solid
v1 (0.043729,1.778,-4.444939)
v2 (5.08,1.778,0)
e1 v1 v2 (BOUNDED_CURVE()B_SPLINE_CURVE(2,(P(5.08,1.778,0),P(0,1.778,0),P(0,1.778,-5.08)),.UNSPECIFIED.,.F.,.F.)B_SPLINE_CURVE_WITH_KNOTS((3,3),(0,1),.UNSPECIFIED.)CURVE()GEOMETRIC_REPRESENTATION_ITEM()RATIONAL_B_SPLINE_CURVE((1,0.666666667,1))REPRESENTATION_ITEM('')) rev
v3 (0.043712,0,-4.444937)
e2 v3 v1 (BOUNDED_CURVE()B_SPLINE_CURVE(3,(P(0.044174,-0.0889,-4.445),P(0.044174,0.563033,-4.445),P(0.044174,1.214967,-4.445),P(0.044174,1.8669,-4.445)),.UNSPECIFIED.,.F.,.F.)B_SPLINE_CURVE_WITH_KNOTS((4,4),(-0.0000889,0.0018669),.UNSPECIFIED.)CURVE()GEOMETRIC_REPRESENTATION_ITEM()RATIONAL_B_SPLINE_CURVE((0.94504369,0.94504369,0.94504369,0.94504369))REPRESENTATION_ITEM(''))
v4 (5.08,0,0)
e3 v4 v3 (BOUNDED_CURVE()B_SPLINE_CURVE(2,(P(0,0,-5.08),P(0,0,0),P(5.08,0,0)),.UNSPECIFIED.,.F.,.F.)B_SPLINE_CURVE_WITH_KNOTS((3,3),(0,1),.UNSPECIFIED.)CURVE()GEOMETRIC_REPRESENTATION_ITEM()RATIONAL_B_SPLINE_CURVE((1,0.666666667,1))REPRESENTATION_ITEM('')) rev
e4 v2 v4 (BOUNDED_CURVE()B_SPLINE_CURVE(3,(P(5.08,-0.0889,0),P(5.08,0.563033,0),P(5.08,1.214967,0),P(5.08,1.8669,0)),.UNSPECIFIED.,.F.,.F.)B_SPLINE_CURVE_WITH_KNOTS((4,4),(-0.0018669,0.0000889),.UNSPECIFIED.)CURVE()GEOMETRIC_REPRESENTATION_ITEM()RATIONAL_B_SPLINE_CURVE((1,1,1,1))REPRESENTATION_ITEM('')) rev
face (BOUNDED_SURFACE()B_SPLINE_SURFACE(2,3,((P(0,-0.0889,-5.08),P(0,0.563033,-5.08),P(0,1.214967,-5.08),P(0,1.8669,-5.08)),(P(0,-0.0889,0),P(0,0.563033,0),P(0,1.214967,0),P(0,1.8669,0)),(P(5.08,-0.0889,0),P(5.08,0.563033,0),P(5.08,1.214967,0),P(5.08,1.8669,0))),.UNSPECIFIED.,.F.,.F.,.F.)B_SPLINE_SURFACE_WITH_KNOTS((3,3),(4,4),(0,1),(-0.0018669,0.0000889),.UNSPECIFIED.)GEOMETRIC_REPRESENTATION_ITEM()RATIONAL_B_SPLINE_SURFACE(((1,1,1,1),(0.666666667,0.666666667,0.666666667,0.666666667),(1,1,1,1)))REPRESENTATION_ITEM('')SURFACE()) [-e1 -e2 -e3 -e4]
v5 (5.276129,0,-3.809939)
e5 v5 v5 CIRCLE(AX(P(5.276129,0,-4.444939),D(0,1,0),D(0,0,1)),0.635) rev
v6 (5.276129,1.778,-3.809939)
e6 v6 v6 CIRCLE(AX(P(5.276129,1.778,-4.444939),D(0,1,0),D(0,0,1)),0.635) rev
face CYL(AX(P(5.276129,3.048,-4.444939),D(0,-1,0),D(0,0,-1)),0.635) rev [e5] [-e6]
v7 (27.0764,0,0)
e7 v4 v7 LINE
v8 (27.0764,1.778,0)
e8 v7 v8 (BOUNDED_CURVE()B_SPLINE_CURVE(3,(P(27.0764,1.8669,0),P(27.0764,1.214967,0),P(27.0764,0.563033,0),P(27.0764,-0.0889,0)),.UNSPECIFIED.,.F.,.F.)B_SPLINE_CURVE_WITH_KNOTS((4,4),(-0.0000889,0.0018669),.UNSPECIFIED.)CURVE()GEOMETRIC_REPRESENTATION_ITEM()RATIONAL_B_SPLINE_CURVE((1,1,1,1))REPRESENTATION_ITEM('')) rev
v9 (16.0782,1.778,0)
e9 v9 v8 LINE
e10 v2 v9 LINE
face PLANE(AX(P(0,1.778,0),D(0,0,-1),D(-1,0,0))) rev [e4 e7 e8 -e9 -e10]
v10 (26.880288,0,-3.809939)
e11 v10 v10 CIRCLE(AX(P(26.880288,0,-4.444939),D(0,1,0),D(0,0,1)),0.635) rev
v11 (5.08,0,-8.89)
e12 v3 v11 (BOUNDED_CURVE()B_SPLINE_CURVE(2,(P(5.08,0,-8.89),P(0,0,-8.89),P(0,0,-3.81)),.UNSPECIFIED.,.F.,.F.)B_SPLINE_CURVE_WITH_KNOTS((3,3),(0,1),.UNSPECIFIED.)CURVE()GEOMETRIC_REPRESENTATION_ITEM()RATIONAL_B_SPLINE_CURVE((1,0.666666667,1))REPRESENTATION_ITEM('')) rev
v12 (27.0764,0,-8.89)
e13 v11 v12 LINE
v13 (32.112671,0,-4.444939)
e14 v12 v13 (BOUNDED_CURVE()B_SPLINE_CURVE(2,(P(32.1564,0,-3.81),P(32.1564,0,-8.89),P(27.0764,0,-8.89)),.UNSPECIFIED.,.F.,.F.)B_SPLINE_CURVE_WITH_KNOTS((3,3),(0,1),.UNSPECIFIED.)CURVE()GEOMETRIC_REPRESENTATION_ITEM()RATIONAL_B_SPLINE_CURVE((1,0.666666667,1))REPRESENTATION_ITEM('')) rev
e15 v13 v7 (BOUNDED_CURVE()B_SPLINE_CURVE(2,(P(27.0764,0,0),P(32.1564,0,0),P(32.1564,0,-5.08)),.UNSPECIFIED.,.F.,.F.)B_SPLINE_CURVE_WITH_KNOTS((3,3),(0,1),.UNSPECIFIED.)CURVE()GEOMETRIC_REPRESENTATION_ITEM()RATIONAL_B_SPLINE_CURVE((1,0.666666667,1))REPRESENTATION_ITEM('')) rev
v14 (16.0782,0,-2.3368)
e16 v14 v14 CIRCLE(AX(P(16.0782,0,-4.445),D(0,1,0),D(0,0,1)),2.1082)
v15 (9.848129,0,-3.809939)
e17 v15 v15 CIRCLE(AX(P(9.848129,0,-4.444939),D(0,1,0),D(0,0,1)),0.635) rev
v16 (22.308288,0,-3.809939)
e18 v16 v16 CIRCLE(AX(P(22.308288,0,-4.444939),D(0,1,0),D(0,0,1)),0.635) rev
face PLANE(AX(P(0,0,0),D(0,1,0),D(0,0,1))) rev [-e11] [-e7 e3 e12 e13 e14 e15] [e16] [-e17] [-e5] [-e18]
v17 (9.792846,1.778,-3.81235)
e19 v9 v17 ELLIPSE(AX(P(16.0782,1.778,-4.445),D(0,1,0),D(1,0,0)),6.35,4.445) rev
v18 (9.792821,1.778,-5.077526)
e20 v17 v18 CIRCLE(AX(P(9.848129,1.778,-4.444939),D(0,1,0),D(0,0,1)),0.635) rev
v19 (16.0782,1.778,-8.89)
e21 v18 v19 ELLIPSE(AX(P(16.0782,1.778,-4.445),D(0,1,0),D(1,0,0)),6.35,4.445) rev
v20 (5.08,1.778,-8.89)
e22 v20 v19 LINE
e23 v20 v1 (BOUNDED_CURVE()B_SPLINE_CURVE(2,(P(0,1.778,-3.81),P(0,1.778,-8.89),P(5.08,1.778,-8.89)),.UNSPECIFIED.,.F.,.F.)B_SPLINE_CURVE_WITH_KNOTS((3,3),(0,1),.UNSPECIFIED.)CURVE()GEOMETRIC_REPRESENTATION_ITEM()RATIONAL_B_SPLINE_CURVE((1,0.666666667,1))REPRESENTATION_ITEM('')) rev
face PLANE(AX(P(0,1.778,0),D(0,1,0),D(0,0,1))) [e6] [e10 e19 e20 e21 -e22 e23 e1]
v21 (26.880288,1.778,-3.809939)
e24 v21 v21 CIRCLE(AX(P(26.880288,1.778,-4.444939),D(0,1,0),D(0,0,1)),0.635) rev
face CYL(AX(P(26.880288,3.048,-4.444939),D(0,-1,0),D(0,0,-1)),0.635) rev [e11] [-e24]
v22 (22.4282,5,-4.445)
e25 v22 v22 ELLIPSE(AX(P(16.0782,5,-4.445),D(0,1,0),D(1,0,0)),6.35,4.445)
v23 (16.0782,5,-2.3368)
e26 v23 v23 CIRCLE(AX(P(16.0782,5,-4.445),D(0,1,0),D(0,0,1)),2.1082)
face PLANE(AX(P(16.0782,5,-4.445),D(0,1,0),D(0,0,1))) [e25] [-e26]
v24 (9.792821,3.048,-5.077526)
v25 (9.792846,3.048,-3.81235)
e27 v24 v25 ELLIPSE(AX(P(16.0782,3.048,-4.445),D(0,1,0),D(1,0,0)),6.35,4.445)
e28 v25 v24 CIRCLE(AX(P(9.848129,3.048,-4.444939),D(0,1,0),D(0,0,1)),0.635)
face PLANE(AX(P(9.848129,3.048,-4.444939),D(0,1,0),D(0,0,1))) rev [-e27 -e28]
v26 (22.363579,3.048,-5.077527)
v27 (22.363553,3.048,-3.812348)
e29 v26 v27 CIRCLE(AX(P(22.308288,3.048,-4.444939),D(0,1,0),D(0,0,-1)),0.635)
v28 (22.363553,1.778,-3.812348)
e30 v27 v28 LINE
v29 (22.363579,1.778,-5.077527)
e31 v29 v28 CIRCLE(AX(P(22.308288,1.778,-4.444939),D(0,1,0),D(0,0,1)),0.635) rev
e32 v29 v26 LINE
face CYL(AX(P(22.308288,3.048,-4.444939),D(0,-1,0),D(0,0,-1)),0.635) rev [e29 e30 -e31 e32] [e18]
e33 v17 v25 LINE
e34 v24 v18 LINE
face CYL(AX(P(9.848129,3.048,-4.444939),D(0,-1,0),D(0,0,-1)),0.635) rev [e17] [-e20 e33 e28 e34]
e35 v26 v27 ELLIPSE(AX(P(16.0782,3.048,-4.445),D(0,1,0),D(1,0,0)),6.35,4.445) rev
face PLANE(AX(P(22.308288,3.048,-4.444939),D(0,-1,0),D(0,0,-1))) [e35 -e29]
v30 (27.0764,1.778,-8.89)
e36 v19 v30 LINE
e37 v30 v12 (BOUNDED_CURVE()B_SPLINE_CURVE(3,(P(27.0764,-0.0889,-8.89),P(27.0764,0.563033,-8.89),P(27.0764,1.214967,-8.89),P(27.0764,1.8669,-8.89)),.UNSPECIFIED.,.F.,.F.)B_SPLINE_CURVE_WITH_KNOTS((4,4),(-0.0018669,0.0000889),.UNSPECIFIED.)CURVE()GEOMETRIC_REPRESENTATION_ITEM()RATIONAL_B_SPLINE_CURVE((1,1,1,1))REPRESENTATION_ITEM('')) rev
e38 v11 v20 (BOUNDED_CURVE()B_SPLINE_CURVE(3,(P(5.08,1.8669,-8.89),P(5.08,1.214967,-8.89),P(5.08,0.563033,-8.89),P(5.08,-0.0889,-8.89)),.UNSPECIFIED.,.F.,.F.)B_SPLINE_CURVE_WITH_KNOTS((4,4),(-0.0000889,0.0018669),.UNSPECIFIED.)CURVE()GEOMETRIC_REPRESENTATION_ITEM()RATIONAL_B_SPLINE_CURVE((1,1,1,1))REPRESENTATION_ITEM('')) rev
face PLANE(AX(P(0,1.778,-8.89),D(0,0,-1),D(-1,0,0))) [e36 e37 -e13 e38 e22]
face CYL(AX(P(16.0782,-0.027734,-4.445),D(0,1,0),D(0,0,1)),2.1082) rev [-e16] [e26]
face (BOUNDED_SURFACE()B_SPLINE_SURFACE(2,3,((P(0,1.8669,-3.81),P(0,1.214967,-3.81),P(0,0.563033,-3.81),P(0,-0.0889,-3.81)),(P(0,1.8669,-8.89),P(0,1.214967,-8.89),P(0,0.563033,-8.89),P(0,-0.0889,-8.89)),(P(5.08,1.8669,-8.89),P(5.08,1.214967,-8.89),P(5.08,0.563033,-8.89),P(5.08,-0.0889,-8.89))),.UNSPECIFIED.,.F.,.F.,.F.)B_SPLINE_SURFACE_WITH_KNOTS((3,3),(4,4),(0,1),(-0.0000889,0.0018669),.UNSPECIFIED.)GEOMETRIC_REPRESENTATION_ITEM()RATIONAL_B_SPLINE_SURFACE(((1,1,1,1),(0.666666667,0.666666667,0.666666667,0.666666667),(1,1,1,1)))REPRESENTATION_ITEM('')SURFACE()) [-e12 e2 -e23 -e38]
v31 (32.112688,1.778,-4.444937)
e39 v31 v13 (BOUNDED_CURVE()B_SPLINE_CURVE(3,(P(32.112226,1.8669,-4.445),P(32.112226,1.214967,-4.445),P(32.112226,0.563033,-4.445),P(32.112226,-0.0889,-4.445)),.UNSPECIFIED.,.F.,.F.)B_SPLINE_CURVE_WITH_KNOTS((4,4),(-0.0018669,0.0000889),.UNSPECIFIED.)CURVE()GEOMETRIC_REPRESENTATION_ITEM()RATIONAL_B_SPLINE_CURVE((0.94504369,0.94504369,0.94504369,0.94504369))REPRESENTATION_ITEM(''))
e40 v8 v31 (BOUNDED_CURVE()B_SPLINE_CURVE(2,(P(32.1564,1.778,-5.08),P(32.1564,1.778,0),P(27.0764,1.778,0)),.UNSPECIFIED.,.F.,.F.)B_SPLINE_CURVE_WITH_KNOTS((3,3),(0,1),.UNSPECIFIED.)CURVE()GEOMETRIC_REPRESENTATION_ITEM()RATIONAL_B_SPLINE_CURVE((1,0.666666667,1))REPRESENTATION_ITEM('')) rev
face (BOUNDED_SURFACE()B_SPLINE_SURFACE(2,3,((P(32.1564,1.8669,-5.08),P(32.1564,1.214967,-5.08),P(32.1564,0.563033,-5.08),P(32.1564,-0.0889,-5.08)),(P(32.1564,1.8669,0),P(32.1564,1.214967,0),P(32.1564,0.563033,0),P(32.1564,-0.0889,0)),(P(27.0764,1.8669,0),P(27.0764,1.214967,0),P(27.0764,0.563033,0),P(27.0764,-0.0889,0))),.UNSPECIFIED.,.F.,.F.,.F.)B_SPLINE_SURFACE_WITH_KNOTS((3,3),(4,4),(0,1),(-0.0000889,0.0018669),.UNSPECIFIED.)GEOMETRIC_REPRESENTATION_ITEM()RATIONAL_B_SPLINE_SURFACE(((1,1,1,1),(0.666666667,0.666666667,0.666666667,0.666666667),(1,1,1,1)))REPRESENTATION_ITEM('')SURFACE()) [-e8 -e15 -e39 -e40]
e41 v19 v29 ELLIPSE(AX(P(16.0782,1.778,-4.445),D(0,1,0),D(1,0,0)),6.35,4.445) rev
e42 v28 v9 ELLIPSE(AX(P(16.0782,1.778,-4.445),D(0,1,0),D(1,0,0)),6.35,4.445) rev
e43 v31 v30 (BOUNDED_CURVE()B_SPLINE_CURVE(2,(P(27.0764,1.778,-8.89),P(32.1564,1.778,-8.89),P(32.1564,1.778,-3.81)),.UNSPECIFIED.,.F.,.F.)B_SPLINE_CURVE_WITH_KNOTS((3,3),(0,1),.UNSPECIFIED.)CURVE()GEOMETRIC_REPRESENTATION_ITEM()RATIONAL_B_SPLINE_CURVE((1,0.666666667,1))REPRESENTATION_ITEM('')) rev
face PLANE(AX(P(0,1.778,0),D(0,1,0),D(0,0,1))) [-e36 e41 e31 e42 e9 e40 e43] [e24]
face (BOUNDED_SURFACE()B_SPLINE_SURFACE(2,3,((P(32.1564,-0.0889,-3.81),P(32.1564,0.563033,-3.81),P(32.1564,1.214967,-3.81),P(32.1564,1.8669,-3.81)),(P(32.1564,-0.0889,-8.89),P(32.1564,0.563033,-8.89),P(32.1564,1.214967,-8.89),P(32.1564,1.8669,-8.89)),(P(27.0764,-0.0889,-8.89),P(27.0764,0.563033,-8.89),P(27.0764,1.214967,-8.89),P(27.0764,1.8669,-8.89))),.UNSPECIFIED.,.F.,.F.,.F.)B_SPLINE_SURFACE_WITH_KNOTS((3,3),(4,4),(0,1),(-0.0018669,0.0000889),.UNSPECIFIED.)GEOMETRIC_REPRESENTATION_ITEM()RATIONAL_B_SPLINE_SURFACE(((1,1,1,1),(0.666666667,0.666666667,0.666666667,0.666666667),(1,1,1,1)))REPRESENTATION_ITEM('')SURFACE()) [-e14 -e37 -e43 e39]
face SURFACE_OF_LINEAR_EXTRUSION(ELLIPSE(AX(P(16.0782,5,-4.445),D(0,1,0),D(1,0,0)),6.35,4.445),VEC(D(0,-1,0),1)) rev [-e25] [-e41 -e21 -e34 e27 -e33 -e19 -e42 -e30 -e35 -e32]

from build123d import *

# Parameters (mm, degrees)
SKETCH1_W               = 32.1564
SKETCH1_H               = 8.89
SKETCH1_R               = 1.2319
BOSS_EXTRUDE1_DEPTH     = 1.778
CUT_EXTRUDE1_DEPTH      = 32.409990197
CUT_EXTRUDE1_DEPTH_BACK = 34.409990197
CUT_EXTRUDE1_START      = 2
FILLET1_SIZE            = 5.08
SKETCH1_7_RX            = 6.35
SKETCH1_7_RY            = 4.445
BOSS_EXTRUDE2_DEPTH     = 5
CUT_EXTRUDE2_DEPTH      = 34.69313211
CUT_EXTRUDE2_DEPTH_BACK = 34.69313211
CUT_EXTRUDE3_DEPTH      = 1.27
CUT_EXTRUDE3_DEPTH_BACK = 12.7
SKETCH2_R               = 0.635


with BuildPart() as part:
    # Sketch1 → Boss-Extrude1 (new body)
    with BuildSketch(Plane(origin=(0, 0, 0), x_dir=(1, 0, 0), z_dir=(0, 1, 0))):
        with Locations((16.0782, 4.445)):
            Rectangle(SKETCH1_W, SKETCH1_H)
        with Locations(Location((16.0782, 4.445, 0), (0, 0, 270))):
            Circle(SKETCH1_R, mode=Mode.SUBTRACT)
    extrude(amount=BOSS_EXTRUDE1_DEPTH)

    # Sketch1<5> → Cut-Extrude1 (cut, two sides: drawn at the far end of the back side and taken through both)
    with BuildSketch(Plane(origin=(0, 0, 0), x_dir=(1, 0, 0), z_dir=(0, 1, 0)).offset(CUT_EXTRUDE1_START - CUT_EXTRUDE1_DEPTH_BACK)):
        with BuildLine():
            ThreePointArc((18.1864, 4.445), (17.568922516, 5.935722516), (16.0782, 6.5532))
            Line((16.0782, 6.5532), (16.0782, 5.6769))
            ThreePointArc((16.0782, 5.6769), (16.949284844, 5.316084844), (17.3101, 4.445))
            ThreePointArc((17.3101, 4.445), (16.949284844, 3.573915156), (16.0782, 3.2131))
            Line((16.0782, 3.2131), (16.0782, 2.3368))
            ThreePointArc((16.0782, 2.3368), (17.568922516, 2.954277484), (18.1864, 4.445))
        make_face()
        with BuildLine():
            Line((16.0782, 5.6769), (16.0782, 6.5532))
            ThreePointArc((16.0782, 6.5532), (13.97, 4.445), (16.0782, 2.3368))
            Line((16.0782, 2.3368), (16.0782, 3.2131))
            ThreePointArc((16.0782, 3.2131), (14.8463, 4.445), (16.0782, 5.6769))
        make_face()
        with BuildLine():
            ThreePointArc((17.3101, 4.445), (16.949284844, 5.316084844), (16.0782, 5.6769))
            Line((16.0782, 5.6769), (16.0782, 3.2131))
            ThreePointArc((16.0782, 3.2131), (16.949284844, 3.573915156), (17.3101, 4.445))
        make_face()
        with BuildLine():
            Line((16.0782, 3.2131), (16.0782, 5.6769))
            ThreePointArc((16.0782, 5.6769), (14.8463, 4.445), (16.0782, 3.2131))
        make_face()
    extrude(amount=CUT_EXTRUDE1_DEPTH + CUT_EXTRUDE1_DEPTH_BACK, mode=Mode.SUBTRACT)

    # Fillet1
    # a fillet whose section is not a circle: 5.08 mm, written as the material it takes off along each edge
    with BuildSketch(Plane(origin=(32.1564, -12.7, -8.89), x_dir=(0, 0, 1), z_dir=(0, 1, 0)), Plane(origin=(32.1564, -12.7, 0), x_dir=(-1, 0, 0), z_dir=(0, 1, 0))) as fillet1_piece_1:
        with BuildLine():
            Bezier((FILLET1_SIZE, 0), (0, 0), (0, -FILLET1_SIZE), weights=[1, 0.666666667, 1])
            Line((0, -FILLET1_SIZE), (0, 0))
            Line((0, 0), (FILLET1_SIZE, 0))
        make_face()
    extrude(amount=27.178, mode=Mode.SUBTRACT)
    with BuildSketch(Plane(origin=(0, -12.7, -8.89), x_dir=(0, 0, 1), z_dir=(0, 1, 0)), Plane(origin=(0, -12.7, 0), x_dir=(1, 0, 0), z_dir=(0, 1, 0))) as fillet1_piece_2:
        with BuildLine():
            Bezier((FILLET1_SIZE, 0), (0, 0), (0, FILLET1_SIZE), weights=[1, 0.666666667, 1])
            Line((0, FILLET1_SIZE), (0, 0))
            Line((0, 0), (FILLET1_SIZE, 0))
        make_face()
    extrude(amount=27.178, mode=Mode.SUBTRACT)

    # Sketch1<7> → Boss-Extrude2 (add)
    with BuildSketch(Plane(origin=(0, 0, 0), x_dir=(1, 0, 0), z_dir=(0, 1, 0))):
        with Locations(Location((16.0782, 4.445), (0, 0, 0))):
            Ellipse(SKETCH1_7_RX, SKETCH1_7_RY)
    extrude(amount=BOSS_EXTRUDE2_DEPTH)

    # Sketch1<8> → Cut-Extrude2 (cut, two sides: drawn at the far end of the back side and taken through both)
    with BuildSketch(Plane(origin=(0, 0, 0), x_dir=(1, 0, 0), z_dir=(0, 1, 0)).offset(-CUT_EXTRUDE2_DEPTH_BACK)):
        with BuildLine():
            ThreePointArc((18.1864, 4.445), (17.568922516, 5.935722516), (16.0782, 6.5532))
            Line((16.0782, 6.5532), (16.0782, 5.6769))
            ThreePointArc((16.0782, 5.6769), (16.949284844, 5.316084844), (17.3101, 4.445))
            ThreePointArc((17.3101, 4.445), (16.949284844, 3.573915156), (16.0782, 3.2131))
            Line((16.0782, 3.2131), (16.0782, 2.3368))
            ThreePointArc((16.0782, 2.3368), (17.568922516, 2.954277484), (18.1864, 4.445))
        make_face()
        with BuildLine():
            Line((16.0782, 5.6769), (16.0782, 6.5532))
            ThreePointArc((16.0782, 6.5532), (13.97, 4.445), (16.0782, 2.3368))
            Line((16.0782, 2.3368), (16.0782, 3.2131))
            ThreePointArc((16.0782, 3.2131), (14.8463, 4.445), (16.0782, 5.6769))
        make_face()
    extrude(amount=CUT_EXTRUDE2_DEPTH + CUT_EXTRUDE2_DEPTH_BACK, mode=Mode.SUBTRACT)


with BuildPart() as cut_extrude2_kept_piece:
    # of the separate pieces the step leaves, the one the design keeps (cut_extrude2_pieces_kept)
    add(part.part.solids().sort_by_distance((5.08, 0, 0))[0])

    # Sketch2 → Cut-Extrude3 (cut, two sides: drawn at the far end of the back side and taken through both)
    with BuildSketch(Plane(origin=(0, 1.778, 0), x_dir=(1, 0, 0), z_dir=(0, 1, 0)).offset(-CUT_EXTRUDE3_DEPTH_BACK)):
        with Locations(Location((9.848128616, 4.444938826, 0), (0, 0, 94.99673829))):
            Circle(SKETCH2_R)
        with Locations(Location((5.276128616, 4.444938826, 0), (0, 0, 270))):
            Circle(SKETCH2_R)
        with Locations(Location((22.308288089, 4.444938826, 0), (0, 0, 85.004802362))):
            Circle(SKETCH2_R)
        with Locations(Location((26.880288089, 4.444938826, 0), (0, 0, 270))):
            Circle(SKETCH2_R)
    extrude(amount=CUT_EXTRUDE3_DEPTH + CUT_EXTRUDE3_DEPTH_BACK, mode=Mode.SUBTRACT)


solid = cut_extrude2_kept_piece.part
